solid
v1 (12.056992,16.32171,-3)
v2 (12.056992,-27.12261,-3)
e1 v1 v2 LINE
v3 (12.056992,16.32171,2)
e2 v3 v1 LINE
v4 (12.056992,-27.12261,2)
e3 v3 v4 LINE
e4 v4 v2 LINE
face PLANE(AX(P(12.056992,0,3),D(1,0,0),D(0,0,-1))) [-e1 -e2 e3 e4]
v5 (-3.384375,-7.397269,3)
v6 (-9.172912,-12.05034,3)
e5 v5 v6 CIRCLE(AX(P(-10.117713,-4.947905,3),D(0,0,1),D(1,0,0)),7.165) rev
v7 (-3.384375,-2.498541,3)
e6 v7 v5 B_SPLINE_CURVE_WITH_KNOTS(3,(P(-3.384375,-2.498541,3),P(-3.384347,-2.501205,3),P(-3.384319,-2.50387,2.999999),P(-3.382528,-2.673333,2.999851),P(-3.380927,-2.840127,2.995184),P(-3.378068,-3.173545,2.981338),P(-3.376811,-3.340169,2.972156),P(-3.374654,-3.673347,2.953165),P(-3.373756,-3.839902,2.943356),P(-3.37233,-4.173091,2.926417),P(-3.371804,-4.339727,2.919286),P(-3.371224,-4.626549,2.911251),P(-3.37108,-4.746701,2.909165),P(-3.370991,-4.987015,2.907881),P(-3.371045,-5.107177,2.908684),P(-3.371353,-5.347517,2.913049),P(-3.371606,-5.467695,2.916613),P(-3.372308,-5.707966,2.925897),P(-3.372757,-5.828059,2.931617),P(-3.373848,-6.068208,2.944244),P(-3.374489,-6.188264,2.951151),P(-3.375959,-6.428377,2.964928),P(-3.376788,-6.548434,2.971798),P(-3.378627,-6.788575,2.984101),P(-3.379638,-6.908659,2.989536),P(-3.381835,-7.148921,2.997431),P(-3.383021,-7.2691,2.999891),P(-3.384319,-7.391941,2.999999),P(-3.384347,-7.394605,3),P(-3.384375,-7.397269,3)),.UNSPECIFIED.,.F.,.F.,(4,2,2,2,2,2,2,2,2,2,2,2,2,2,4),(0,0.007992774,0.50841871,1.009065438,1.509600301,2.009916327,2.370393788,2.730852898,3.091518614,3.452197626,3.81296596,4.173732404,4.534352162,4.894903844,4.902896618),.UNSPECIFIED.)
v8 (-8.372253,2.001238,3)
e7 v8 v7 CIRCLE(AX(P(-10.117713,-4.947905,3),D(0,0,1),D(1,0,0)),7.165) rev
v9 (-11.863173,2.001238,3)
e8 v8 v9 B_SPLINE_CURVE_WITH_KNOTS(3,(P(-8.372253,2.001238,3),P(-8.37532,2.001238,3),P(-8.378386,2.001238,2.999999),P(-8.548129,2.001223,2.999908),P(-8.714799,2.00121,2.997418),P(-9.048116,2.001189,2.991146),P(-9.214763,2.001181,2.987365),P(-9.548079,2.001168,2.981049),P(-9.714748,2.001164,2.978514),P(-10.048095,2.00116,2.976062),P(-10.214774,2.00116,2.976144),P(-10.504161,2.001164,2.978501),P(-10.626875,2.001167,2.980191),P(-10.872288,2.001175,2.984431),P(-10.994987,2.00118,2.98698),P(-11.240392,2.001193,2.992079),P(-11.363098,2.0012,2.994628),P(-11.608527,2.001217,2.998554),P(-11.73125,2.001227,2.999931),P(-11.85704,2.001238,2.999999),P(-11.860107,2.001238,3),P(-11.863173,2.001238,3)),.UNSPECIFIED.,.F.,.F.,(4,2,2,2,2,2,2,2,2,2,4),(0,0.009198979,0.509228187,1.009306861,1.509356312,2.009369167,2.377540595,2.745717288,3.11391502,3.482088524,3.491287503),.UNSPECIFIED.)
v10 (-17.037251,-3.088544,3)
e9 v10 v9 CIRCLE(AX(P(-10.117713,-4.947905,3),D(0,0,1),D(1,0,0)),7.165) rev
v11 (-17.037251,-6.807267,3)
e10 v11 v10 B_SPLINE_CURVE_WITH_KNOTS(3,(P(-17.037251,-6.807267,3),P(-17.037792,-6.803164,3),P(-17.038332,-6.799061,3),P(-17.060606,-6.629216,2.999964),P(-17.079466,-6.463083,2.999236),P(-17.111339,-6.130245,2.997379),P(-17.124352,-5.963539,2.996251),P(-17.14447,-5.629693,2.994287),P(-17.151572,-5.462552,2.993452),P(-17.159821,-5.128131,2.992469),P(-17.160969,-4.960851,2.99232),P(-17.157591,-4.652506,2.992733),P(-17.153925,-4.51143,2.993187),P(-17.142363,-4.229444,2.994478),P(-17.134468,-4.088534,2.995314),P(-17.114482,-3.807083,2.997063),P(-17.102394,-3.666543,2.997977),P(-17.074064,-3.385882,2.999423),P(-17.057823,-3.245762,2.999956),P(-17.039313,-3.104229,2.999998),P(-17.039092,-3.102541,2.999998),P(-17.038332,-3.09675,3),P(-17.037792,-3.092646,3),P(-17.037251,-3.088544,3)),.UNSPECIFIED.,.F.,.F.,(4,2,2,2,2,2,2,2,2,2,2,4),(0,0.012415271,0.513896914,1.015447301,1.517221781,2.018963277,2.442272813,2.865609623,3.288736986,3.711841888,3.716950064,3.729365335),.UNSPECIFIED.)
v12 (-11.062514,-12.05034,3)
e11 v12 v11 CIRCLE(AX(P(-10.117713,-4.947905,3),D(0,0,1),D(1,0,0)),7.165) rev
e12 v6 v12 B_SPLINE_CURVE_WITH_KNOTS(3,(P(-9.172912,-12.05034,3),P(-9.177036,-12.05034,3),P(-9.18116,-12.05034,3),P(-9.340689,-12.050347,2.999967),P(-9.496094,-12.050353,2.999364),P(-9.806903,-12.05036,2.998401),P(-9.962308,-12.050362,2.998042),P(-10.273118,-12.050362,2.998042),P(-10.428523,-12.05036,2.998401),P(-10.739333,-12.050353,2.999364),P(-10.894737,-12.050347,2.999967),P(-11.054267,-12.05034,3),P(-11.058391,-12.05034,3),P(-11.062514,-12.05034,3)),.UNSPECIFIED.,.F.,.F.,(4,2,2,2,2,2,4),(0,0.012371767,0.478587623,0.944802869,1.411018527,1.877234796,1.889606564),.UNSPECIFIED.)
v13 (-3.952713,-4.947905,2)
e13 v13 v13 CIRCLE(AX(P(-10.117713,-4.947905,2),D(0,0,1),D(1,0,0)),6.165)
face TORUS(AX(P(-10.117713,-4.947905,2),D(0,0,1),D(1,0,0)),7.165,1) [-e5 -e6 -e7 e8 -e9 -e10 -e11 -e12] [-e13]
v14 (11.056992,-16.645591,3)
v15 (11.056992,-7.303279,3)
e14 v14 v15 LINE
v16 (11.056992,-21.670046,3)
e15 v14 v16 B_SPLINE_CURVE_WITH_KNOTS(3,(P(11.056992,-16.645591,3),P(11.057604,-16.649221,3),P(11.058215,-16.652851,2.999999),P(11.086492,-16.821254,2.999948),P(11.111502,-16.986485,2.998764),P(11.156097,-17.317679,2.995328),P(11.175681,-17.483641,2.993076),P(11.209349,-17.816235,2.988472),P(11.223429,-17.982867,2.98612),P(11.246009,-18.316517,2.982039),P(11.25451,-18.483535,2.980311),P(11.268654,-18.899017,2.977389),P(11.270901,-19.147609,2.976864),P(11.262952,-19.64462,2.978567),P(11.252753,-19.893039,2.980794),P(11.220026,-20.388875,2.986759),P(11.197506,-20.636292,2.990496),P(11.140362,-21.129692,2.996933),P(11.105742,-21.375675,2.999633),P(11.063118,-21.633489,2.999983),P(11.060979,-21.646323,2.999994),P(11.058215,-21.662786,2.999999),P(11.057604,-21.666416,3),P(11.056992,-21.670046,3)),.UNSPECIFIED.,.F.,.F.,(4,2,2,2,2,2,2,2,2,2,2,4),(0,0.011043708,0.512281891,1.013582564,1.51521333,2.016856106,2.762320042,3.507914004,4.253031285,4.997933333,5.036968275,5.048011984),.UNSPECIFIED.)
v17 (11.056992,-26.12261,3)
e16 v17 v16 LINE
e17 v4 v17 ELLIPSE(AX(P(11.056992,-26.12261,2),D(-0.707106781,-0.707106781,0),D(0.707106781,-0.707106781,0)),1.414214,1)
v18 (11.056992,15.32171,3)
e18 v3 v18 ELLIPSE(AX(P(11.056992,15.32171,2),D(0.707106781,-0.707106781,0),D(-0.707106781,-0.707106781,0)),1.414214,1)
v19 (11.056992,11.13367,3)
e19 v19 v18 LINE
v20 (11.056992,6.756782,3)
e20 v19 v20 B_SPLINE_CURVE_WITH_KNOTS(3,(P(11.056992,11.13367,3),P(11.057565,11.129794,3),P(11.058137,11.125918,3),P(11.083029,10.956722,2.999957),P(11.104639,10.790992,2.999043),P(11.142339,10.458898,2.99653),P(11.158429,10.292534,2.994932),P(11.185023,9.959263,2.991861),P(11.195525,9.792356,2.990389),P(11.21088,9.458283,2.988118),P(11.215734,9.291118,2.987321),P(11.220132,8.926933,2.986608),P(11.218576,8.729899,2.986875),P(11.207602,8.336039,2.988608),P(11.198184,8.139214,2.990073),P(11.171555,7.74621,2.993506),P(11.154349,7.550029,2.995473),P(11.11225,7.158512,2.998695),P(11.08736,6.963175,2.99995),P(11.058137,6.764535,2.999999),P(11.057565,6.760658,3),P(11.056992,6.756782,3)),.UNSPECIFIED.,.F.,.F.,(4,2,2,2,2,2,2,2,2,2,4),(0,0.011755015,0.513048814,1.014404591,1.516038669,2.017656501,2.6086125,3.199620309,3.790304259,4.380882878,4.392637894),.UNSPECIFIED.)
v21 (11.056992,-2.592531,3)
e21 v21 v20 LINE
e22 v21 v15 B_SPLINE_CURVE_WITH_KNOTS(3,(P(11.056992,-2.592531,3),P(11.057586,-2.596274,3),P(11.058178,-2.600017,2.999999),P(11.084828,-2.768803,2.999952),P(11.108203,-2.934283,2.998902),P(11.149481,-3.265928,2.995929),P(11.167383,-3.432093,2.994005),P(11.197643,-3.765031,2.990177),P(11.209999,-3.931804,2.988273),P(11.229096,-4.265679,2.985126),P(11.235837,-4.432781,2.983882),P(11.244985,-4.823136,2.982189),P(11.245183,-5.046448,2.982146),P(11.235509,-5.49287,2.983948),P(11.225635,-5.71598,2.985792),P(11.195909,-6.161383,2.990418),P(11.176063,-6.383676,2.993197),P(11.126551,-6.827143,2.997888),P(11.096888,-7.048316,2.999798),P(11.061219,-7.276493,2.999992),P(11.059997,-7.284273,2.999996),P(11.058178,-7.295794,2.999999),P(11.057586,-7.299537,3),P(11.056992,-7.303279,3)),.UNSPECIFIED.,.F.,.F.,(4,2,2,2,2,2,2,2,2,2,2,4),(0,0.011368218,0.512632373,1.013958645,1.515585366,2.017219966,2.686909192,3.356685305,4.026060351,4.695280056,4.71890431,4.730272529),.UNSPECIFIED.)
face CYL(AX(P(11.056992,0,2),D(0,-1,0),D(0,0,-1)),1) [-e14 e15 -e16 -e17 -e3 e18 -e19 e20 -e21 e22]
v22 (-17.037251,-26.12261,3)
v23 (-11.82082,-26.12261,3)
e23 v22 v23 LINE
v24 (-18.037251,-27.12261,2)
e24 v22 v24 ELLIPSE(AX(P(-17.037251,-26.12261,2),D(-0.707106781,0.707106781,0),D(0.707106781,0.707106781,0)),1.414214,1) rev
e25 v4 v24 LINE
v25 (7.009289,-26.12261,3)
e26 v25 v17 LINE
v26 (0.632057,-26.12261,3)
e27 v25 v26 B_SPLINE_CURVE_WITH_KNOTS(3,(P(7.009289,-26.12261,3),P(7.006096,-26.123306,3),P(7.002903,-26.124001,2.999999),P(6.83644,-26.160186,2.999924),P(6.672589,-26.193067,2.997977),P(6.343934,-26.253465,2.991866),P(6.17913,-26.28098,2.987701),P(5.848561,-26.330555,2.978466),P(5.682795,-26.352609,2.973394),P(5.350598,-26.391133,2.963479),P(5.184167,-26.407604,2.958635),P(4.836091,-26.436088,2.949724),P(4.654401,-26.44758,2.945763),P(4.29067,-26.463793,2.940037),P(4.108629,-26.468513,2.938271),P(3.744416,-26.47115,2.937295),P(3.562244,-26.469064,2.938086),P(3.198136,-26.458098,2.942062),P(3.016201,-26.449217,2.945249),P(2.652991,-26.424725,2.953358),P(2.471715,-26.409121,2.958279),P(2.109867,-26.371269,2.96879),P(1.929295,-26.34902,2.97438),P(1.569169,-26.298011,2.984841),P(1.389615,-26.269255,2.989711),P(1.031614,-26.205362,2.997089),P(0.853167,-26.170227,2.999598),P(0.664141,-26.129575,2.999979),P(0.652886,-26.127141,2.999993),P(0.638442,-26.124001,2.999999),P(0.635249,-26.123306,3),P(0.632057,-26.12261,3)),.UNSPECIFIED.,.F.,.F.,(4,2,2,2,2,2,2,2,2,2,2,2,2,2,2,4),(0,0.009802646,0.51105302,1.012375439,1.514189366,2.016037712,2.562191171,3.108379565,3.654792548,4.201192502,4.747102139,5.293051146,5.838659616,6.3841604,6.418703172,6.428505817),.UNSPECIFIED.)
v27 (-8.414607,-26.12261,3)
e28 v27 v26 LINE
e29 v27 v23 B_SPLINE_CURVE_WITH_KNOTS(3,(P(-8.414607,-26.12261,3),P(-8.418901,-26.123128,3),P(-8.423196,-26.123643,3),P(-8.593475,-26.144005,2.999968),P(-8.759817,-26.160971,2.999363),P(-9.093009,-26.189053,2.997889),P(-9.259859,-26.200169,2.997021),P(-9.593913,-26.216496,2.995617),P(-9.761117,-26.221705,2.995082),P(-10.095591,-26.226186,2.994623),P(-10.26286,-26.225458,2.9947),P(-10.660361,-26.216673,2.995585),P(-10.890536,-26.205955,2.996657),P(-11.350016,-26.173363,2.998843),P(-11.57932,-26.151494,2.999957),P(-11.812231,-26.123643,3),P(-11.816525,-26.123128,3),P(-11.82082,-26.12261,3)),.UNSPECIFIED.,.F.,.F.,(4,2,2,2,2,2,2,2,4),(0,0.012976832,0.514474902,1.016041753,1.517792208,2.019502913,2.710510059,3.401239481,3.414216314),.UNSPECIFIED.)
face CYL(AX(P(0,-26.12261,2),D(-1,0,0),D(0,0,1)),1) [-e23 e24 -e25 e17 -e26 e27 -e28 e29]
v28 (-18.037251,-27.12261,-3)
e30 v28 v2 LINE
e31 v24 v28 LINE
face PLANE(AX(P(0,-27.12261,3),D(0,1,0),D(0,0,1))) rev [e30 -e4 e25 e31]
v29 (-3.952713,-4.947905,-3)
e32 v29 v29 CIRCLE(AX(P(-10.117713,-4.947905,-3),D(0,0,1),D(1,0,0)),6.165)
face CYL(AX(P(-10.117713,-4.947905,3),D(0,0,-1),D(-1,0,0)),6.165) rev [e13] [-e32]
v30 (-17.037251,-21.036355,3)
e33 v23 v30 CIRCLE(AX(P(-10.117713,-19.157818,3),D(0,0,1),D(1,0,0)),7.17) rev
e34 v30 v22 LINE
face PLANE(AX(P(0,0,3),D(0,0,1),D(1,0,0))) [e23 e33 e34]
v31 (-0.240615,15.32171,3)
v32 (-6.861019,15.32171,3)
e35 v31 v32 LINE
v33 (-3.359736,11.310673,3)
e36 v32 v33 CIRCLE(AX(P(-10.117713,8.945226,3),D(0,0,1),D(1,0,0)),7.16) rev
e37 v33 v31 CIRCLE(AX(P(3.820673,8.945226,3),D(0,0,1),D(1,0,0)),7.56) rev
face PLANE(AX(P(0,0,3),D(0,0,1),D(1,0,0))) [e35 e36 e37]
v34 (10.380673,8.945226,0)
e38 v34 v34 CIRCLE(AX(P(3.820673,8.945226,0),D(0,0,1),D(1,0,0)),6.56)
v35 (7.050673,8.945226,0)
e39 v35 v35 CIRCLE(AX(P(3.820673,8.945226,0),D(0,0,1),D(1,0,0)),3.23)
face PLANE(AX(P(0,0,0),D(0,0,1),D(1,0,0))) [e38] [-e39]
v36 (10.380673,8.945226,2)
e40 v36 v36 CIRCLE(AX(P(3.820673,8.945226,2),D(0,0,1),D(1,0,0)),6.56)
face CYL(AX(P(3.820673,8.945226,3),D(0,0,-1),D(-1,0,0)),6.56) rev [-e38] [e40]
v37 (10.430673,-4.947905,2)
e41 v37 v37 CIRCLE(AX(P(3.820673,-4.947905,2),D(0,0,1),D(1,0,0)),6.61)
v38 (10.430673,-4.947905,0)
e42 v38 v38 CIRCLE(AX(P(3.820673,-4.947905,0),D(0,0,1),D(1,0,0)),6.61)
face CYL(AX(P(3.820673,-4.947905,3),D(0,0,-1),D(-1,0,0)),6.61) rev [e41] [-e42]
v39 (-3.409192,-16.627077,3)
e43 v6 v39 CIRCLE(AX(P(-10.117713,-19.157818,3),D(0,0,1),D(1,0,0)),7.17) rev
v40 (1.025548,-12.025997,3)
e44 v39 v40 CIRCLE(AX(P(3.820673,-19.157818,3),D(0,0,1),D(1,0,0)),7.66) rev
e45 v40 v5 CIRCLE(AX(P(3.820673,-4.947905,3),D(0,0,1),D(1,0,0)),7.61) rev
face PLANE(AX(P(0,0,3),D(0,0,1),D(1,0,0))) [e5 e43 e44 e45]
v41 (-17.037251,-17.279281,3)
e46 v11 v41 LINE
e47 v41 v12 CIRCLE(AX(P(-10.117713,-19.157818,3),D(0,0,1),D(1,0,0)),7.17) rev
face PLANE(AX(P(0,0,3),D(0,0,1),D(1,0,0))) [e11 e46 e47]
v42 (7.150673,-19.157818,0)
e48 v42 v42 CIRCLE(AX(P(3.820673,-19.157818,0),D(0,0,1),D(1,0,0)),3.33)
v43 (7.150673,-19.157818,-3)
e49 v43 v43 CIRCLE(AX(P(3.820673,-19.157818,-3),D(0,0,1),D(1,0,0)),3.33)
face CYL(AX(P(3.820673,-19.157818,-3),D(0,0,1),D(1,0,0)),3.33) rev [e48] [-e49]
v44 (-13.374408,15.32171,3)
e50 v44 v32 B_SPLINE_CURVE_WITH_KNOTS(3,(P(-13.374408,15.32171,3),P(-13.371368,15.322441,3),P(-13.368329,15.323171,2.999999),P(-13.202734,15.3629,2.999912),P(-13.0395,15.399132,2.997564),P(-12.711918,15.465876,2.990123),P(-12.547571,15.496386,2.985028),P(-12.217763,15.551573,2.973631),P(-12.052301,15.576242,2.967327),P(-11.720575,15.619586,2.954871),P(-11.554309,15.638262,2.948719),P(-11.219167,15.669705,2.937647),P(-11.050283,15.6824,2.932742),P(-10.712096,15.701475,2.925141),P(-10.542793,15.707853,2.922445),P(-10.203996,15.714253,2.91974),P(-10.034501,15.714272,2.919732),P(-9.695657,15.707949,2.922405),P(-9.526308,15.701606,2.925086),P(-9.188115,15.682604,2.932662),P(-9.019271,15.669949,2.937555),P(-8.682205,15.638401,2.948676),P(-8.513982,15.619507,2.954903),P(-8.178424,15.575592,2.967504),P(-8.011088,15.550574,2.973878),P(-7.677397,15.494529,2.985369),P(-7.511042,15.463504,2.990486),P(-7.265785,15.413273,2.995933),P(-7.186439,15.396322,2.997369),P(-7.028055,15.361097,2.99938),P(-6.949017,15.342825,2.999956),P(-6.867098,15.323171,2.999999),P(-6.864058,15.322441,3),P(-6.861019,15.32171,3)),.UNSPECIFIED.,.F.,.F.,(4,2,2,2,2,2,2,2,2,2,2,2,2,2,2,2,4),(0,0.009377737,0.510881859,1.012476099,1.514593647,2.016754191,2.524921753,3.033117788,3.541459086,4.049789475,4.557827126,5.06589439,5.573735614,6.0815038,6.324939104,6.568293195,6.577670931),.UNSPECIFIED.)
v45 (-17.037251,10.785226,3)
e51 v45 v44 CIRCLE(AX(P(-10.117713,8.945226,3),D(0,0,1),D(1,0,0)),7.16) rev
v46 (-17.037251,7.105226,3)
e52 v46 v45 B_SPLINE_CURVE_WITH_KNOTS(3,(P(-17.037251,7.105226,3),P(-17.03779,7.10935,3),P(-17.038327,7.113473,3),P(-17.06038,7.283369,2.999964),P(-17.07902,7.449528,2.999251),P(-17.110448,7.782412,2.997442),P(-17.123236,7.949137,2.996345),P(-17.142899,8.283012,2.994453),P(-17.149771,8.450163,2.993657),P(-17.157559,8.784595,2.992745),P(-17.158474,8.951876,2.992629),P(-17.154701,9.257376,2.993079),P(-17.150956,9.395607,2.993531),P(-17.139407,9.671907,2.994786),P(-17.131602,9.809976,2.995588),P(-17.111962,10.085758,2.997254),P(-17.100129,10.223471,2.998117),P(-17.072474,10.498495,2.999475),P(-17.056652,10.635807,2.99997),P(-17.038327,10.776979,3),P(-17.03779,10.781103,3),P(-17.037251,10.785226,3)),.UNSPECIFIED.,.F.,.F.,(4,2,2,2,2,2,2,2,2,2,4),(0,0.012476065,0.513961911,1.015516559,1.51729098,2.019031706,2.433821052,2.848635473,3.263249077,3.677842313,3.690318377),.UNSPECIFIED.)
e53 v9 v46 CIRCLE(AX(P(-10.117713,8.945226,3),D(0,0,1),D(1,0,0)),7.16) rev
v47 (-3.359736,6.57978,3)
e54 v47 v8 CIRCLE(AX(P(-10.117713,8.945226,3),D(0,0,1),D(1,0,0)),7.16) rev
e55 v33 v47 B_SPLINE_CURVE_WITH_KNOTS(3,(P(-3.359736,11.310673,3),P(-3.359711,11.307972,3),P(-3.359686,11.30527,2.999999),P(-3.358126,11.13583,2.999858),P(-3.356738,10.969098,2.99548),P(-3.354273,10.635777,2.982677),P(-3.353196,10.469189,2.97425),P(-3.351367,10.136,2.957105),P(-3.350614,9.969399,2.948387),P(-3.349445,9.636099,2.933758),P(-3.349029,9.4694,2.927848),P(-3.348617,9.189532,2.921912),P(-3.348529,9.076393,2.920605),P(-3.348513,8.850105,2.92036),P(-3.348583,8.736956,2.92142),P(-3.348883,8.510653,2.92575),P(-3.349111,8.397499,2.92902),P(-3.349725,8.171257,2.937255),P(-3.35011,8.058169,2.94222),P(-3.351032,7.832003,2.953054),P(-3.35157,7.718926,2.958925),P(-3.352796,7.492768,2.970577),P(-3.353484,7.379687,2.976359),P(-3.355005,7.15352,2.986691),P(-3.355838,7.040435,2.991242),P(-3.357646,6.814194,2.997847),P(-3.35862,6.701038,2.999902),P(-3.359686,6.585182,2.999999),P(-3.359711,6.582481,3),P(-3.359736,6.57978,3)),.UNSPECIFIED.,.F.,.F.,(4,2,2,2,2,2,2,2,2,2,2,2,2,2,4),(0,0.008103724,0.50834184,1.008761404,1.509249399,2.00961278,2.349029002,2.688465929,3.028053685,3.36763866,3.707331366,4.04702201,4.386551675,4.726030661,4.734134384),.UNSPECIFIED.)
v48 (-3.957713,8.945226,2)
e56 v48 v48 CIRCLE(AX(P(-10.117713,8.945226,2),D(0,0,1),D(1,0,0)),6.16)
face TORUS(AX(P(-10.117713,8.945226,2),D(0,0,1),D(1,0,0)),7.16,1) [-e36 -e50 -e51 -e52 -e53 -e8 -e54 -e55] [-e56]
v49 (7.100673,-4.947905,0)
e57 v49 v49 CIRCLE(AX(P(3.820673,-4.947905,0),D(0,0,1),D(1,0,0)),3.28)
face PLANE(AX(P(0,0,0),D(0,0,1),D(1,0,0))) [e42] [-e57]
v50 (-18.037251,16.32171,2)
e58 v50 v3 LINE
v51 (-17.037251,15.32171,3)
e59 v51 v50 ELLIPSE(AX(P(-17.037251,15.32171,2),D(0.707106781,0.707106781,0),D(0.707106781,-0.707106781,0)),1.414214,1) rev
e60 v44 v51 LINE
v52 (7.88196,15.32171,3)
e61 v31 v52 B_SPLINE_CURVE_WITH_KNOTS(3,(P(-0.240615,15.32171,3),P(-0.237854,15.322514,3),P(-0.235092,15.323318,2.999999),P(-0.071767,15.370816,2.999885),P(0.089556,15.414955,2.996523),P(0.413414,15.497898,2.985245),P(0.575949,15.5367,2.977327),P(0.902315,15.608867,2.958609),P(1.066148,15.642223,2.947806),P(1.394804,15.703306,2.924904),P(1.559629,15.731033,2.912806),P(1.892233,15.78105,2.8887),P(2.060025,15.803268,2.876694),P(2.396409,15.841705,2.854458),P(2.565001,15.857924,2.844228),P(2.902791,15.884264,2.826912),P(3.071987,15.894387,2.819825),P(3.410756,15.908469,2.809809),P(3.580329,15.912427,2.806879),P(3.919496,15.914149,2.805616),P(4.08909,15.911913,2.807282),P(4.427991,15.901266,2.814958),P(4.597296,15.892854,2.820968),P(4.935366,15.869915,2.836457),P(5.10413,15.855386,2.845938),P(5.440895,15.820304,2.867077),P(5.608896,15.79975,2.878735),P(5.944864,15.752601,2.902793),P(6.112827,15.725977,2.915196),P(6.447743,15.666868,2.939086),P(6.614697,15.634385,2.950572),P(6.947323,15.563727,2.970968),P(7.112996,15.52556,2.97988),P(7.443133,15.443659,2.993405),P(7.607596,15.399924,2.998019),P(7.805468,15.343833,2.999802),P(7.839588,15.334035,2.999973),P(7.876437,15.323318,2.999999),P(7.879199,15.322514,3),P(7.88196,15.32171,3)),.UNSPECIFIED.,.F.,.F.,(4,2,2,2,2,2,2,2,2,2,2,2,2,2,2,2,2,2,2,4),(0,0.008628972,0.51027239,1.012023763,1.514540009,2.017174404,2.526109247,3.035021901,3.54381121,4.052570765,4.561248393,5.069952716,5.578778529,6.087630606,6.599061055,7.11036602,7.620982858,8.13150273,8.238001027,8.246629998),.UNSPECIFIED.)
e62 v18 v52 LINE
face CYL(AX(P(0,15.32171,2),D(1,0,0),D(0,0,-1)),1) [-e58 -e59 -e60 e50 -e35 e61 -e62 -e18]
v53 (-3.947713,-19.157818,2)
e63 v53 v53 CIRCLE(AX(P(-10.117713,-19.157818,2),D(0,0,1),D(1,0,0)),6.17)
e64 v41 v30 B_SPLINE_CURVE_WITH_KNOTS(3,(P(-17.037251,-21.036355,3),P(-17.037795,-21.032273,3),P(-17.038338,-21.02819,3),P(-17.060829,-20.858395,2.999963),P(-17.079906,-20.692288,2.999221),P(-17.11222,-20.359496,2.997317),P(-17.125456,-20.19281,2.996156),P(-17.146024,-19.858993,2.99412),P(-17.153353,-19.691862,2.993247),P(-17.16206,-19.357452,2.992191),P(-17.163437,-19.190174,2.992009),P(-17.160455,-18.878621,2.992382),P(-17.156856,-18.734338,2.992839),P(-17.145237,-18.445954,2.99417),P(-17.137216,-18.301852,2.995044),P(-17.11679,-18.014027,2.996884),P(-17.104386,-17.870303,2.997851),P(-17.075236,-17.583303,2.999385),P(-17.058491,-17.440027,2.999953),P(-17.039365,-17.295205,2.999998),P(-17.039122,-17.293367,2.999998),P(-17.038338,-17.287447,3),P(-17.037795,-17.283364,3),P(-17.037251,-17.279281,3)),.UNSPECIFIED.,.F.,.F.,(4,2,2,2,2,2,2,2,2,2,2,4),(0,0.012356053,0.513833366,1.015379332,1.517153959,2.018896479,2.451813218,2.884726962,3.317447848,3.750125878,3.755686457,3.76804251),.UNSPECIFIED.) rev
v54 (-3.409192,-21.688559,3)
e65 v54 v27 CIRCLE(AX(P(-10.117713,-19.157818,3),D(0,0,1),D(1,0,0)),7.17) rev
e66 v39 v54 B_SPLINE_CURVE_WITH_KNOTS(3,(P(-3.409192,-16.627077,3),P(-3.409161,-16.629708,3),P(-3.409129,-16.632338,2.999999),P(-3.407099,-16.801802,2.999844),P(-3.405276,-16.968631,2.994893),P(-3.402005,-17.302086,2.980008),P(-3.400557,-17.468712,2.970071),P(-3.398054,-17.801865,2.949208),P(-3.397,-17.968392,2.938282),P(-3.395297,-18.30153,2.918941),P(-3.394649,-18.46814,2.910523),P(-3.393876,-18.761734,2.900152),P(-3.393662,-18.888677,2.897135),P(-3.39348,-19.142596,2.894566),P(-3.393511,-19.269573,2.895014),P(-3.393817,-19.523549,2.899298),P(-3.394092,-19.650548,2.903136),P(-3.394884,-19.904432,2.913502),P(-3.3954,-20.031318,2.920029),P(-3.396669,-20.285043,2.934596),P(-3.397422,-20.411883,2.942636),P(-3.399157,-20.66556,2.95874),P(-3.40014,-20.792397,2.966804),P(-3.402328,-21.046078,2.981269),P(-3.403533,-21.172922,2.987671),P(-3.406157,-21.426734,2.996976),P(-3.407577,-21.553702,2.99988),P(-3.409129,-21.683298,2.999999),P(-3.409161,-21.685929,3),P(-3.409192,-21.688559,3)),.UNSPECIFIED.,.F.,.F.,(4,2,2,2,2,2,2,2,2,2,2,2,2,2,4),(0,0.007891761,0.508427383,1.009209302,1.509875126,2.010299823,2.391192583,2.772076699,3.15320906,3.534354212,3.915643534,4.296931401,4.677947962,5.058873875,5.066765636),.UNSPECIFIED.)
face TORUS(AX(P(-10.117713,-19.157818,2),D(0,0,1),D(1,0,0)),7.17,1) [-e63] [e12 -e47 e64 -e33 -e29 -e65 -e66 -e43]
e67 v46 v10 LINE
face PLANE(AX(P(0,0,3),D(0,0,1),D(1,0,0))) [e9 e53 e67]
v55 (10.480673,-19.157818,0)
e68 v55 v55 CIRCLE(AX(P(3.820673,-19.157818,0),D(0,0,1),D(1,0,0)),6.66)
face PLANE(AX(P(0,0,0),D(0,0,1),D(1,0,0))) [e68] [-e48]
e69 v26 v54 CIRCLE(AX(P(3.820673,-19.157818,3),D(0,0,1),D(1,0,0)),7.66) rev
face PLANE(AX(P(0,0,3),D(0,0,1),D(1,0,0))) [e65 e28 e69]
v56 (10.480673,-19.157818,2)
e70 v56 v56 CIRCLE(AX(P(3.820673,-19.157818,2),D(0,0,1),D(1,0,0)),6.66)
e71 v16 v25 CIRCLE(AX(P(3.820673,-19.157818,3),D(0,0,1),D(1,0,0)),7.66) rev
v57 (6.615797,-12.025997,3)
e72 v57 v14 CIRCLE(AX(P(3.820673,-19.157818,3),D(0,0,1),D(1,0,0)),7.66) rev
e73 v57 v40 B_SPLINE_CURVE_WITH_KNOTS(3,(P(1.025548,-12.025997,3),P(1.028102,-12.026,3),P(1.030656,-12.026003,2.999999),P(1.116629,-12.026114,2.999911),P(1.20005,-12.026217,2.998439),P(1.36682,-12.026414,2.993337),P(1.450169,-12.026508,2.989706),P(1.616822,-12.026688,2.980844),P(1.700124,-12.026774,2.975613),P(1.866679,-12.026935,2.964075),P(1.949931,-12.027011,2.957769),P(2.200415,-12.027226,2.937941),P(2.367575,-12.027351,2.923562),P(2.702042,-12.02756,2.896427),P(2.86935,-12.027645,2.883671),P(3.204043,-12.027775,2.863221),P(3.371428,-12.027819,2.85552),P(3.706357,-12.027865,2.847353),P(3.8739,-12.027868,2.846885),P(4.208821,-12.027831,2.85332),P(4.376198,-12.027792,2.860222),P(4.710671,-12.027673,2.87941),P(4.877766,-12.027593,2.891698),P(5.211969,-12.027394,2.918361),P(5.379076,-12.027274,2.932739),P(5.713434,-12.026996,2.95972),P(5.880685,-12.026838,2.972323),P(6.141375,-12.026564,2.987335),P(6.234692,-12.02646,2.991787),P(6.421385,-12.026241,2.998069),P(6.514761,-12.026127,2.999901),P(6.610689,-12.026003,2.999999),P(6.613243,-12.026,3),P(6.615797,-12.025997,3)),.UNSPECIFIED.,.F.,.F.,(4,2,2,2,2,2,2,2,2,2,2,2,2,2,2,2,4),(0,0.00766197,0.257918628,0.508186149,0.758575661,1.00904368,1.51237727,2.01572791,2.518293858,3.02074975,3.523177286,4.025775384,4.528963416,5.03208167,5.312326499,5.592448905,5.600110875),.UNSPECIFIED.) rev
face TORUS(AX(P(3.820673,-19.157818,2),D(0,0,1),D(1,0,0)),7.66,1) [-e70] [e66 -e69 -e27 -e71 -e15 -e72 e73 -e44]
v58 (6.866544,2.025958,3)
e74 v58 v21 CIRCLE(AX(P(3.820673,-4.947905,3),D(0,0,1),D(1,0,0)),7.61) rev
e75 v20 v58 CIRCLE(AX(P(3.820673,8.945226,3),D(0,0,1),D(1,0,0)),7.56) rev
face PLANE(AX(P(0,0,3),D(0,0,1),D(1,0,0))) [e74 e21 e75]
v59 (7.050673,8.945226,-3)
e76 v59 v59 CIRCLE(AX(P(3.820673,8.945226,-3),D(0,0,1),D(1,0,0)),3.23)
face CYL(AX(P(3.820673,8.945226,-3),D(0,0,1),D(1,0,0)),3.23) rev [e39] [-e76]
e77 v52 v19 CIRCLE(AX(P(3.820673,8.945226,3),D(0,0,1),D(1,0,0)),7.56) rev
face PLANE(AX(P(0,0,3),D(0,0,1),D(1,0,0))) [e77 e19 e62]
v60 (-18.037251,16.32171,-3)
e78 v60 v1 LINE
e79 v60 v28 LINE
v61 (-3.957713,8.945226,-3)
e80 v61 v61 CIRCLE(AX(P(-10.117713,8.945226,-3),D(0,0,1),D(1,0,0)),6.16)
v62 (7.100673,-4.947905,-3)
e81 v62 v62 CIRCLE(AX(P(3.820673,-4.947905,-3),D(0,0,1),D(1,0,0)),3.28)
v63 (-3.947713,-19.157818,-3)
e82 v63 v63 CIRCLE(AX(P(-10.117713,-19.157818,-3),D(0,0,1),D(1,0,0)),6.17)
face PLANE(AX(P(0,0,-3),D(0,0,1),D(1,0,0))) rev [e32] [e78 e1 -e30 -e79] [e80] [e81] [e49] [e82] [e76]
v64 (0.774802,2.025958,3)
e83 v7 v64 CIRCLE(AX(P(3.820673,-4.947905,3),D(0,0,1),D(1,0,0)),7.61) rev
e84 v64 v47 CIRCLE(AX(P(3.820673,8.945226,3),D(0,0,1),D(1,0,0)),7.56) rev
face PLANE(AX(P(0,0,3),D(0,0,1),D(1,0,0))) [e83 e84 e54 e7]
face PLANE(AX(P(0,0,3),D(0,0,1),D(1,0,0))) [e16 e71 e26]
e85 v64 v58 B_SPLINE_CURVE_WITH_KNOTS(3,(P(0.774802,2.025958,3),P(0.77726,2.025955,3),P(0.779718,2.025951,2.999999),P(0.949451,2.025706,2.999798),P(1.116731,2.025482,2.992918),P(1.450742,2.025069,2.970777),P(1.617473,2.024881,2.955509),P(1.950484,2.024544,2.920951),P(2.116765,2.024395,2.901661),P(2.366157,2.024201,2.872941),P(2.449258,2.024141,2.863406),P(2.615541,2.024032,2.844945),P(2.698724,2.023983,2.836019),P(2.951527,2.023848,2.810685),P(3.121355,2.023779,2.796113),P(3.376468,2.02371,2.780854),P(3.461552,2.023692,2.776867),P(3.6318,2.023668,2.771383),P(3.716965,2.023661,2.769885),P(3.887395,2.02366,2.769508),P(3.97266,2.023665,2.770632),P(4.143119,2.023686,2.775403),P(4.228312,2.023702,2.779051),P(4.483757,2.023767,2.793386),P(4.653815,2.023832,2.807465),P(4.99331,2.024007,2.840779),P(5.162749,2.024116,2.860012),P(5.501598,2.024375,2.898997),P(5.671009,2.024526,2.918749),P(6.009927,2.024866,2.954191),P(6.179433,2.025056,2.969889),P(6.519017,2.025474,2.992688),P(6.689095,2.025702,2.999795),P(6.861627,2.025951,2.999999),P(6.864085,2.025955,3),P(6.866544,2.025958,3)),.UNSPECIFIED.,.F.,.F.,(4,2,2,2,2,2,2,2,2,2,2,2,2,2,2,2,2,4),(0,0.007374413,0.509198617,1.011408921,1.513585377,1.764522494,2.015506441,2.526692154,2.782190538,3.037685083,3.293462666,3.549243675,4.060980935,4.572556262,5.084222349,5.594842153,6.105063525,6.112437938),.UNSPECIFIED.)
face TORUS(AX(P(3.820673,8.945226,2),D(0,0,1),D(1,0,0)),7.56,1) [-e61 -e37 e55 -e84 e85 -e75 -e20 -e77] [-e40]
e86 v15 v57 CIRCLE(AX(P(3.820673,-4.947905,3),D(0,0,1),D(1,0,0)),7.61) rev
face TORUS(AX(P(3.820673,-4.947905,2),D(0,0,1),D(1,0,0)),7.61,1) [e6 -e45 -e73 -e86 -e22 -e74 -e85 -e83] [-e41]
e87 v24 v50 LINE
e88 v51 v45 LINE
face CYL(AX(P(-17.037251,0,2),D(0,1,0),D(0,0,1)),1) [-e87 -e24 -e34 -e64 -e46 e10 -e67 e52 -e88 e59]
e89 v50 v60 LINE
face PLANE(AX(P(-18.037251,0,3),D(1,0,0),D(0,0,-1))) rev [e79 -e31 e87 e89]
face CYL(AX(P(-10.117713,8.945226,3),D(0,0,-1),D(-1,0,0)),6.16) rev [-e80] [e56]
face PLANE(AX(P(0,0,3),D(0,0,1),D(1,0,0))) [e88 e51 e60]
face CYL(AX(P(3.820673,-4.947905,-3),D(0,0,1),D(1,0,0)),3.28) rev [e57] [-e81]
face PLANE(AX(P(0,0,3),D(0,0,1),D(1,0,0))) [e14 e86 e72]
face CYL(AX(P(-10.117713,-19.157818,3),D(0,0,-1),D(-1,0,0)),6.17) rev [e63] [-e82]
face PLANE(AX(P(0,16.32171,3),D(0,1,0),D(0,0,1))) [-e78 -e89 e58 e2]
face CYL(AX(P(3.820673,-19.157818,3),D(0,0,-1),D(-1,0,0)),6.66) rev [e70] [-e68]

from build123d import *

# Parameters (mm, degrees)
SKETCH1_W           = 30.094242496
SKETCH1_H           = 43.444319995
SKETCH1_R           = 6.66
SKETCH1_R_2         = 6.61
SKETCH1_R_3         = 6.56
SKETCH1_R_4         = 6.17
SKETCH1_R_5         = 6.165
SKETCH1_R_6         = 6.16
BOSS_EXTRUDE1_DEPTH = 3
BOSS_EXTRUDE2_START = -3
SKETCH1_3_W         = 30.094242496
SKETCH1_3_H         = 43.444319995
SKETCH1_3_R         = 6.66
SKETCH1_3_R_2       = 6.61
SKETCH1_3_R_3       = 6.56
SKETCH1_3_R_4       = 6.17
SKETCH1_3_R_5       = 6.165
SKETCH1_3_R_6       = 6.16
SKETCH1_3_R_7       = 3.23
SKETCH1_3_R_8       = 3.28
SKETCH1_3_R_9       = 3.33
BOSS_EXTRUDE2_DEPTH = 3
FILLET1_R           = 1


with BuildPart() as part:
    # Sketch1 → Boss-Extrude1 (new body)
    with BuildSketch(Plane.XY):
        with Locations((-2.99012951, -5.400450282)):
            Rectangle(SKETCH1_W, SKETCH1_H)
        with Locations((3.820672739, -19.157818281)):
            Circle(SKETCH1_R, mode=Mode.SUBTRACT)
        with Locations((3.820672739, -4.947905282)):
            Circle(SKETCH1_R_2, mode=Mode.SUBTRACT)
        with Locations((3.820672739, 8.945226216)):
            Circle(SKETCH1_R_3, mode=Mode.SUBTRACT)
        with Locations((-10.117713259, -19.157818281)):
            Circle(SKETCH1_R_4, mode=Mode.SUBTRACT)
        with Locations((-10.117713259, -4.947905282)):
            Circle(SKETCH1_R_5, mode=Mode.SUBTRACT)
        with Locations((-10.117713259, 8.945226216)):
            Circle(SKETCH1_R_6, mode=Mode.SUBTRACT)
    extrude(amount=BOSS_EXTRUDE1_DEPTH)

    # Sketch1<3> → Boss-Extrude2 (add)
    # profile 1 of 4: a face of its own
    with BuildSketch(Plane.XY.offset(BOSS_EXTRUDE2_START)):
        with Locations((-2.99012951, -5.400450282)):
            Rectangle(SKETCH1_3_W, SKETCH1_3_H)
        with Locations((3.820672739, -19.157818281)):
            Circle(SKETCH1_3_R, mode=Mode.SUBTRACT)
        with Locations((3.820672739, -4.947905282)):
            Circle(SKETCH1_3_R_2, mode=Mode.SUBTRACT)
        with Locations((3.820672739, 8.945226216)):
            Circle(SKETCH1_3_R_3, mode=Mode.SUBTRACT)
        with Locations((-10.117713259, -19.157818281)):
            Circle(SKETCH1_3_R_4, mode=Mode.SUBTRACT)
        with Locations((-10.117713259, -4.947905282)):
            Circle(SKETCH1_3_R_5, mode=Mode.SUBTRACT)
        with Locations((-10.117713259, 8.945226216)):
            Circle(SKETCH1_3_R_6, mode=Mode.SUBTRACT)
    # profile 2 of 4: a face of its own
    with BuildSketch(Plane.XY.offset(BOSS_EXTRUDE2_START)):
        with Locations((3.820672739, 8.945226216)):
            Circle(SKETCH1_3_R_3)
        with Locations((3.820672739, 8.945226216)):
            Circle(SKETCH1_3_R_7, mode=Mode.SUBTRACT)
    # profile 3 of 4: a face of its own
    with BuildSketch(Plane.XY.offset(BOSS_EXTRUDE2_START)):
        with Locations((3.820672739, -4.947905282)):
            Circle(SKETCH1_3_R_2)
        with Locations((3.820672739, -4.947905282)):
            Circle(SKETCH1_3_R_8, mode=Mode.SUBTRACT)
    # profile 4 of 4: a face of its own
    with BuildSketch(Plane.XY.offset(BOSS_EXTRUDE2_START)):
        with Locations((3.820672739, -19.157818281)):
            Circle(SKETCH1_3_R)
        with Locations((3.820672739, -19.157818281)):
            Circle(SKETCH1_3_R_9, mode=Mode.SUBTRACT)
    extrude(amount=BOSS_EXTRUDE2_DEPTH)

    # Fillet1
    # the kernel refuses this fillet: 1 mm, written as the material it takes off along each edge
    with BuildSketch(Plane(origin=(3.820672739, -19.157818281, 3), x_dir=(1, 0, 0), z_dir=(0, -1, 0))) as fillet1_piece_1:
        with BuildLine():
            CenterArc((6.66 + FILLET1_R, -FILLET1_R), FILLET1_R, 90, 90)
            Line((6.66 + FILLET1_R, 0), (6.66, 0))
            Line((6.66, 0), (6.66, -FILLET1_R))
        make_face()
    revolve(axis=Axis((3.820672739, -19.157818281, 3), (0, 0, 1)), mode=Mode.SUBTRACT)
    with BuildSketch(Plane(origin=(3.820672739, -4.947905282, 3), x_dir=(1, 0, 0), z_dir=(0, -1, 0))) as fillet1_piece_2:
        with BuildLine():
            CenterArc((6.61 + FILLET1_R, -FILLET1_R), FILLET1_R, 90, 90)
            Line((6.61 + FILLET1_R, 0), (6.61, 0))
            Line((6.61, 0), (6.61, -FILLET1_R))
        make_face()
    revolve(axis=Axis((3.820672739, -4.947905282, 3), (0, 0, 1)), mode=Mode.SUBTRACT)
    with BuildSketch(Plane(origin=(3.820672739, 8.945226216, 3), x_dir=(1, 0, 0), z_dir=(0, -1, 0))) as fillet1_piece_3:
        with BuildLine():
            CenterArc((6.56 + FILLET1_R, -FILLET1_R), FILLET1_R, 90, 90)
            Line((6.56 + FILLET1_R, 0), (6.56, 0))
            Line((6.56, 0), (6.56, -FILLET1_R))
        make_face()
    revolve(axis=Axis((3.820672739, 8.945226216, 3), (0, 0, 1)), mode=Mode.SUBTRACT)
    with BuildSketch(Plane(origin=(-10.117713259, -19.157818281, 3), x_dir=(1, 0, 0), z_dir=(0, -1, 0))) as fillet1_piece_4:
        with BuildLine():
            CenterArc((6.17 + FILLET1_R, -FILLET1_R), FILLET1_R, 90, 90)
            Line((6.17 + FILLET1_R, 0), (6.17, 0))
            Line((6.17, 0), (6.17, -FILLET1_R))
        make_face()
    revolve(axis=Axis((-10.117713259, -19.157818281, 3), (0, 0, 1)), mode=Mode.SUBTRACT)
    with BuildSketch(Plane(origin=(-10.117713259, -4.947905282, 3), x_dir=(1, 0, 0), z_dir=(0, -1, 0))) as fillet1_piece_5:
        with BuildLine():
            CenterArc((6.165 + FILLET1_R, -FILLET1_R), FILLET1_R, 90, 90)
            Line((6.165 + FILLET1_R, 0), (6.165, 0))
            Line((6.165, 0), (6.165, -FILLET1_R))
        make_face()
    revolve(axis=Axis((-10.117713259, -4.947905282, 3), (0, 0, 1)), mode=Mode.SUBTRACT)
    with BuildSketch(Plane(origin=(-10.117713259, 8.945226216, 3), x_dir=(1, 0, 0), z_dir=(0, -1, 0))) as fillet1_piece_6:
        with BuildLine():
            CenterArc((6.16 + FILLET1_R, -FILLET1_R), FILLET1_R, 90, 90)
            Line((6.16 + FILLET1_R, 0), (6.16, 0))
            Line((6.16, 0), (6.16, -FILLET1_R))
        make_face()
    revolve(axis=Axis((-10.117713259, 8.945226216, 3), (0, 0, 1)), mode=Mode.SUBTRACT)
    with BuildSketch(Plane(origin=(12.056991738, 18.821709715, 3), x_dir=(0, 0, -1), z_dir=(0, -1, 0)), Plane(origin=(-18.037250758, -29.62261028, 3), x_dir=(0, 0, -1), z_dir=(0, 1, 0))) as fillet1_piece_7:
        with BuildLine():
            CenterArc((FILLET1_R, -FILLET1_R), FILLET1_R, 90, 90)
            Line((0, -FILLET1_R), (0, 0))
            Line((0, 0), (FILLET1_R, 0))
        make_face()
    extrude(amount=48.444319995, mode=Mode.SUBTRACT)
    with BuildSketch(Plane(origin=(-20.537250758, 16.321709715, 3), x_dir=(0, 0, -1), z_dir=(1, 0, 0)), Plane(origin=(14.556991738, -27.12261028, 3), x_dir=(0, 0, -1), z_dir=(-1, 0, 0))) as fillet1_piece_8:
        with BuildLine():
            CenterArc((FILLET1_R, -FILLET1_R), FILLET1_R, 90, 90)
            Line((0, -FILLET1_R), (0, 0))
            Line((0, 0), (FILLET1_R, 0))
        make_face()
    extrude(amount=35.094242496, mode=Mode.SUBTRACT)


solid = part.part
